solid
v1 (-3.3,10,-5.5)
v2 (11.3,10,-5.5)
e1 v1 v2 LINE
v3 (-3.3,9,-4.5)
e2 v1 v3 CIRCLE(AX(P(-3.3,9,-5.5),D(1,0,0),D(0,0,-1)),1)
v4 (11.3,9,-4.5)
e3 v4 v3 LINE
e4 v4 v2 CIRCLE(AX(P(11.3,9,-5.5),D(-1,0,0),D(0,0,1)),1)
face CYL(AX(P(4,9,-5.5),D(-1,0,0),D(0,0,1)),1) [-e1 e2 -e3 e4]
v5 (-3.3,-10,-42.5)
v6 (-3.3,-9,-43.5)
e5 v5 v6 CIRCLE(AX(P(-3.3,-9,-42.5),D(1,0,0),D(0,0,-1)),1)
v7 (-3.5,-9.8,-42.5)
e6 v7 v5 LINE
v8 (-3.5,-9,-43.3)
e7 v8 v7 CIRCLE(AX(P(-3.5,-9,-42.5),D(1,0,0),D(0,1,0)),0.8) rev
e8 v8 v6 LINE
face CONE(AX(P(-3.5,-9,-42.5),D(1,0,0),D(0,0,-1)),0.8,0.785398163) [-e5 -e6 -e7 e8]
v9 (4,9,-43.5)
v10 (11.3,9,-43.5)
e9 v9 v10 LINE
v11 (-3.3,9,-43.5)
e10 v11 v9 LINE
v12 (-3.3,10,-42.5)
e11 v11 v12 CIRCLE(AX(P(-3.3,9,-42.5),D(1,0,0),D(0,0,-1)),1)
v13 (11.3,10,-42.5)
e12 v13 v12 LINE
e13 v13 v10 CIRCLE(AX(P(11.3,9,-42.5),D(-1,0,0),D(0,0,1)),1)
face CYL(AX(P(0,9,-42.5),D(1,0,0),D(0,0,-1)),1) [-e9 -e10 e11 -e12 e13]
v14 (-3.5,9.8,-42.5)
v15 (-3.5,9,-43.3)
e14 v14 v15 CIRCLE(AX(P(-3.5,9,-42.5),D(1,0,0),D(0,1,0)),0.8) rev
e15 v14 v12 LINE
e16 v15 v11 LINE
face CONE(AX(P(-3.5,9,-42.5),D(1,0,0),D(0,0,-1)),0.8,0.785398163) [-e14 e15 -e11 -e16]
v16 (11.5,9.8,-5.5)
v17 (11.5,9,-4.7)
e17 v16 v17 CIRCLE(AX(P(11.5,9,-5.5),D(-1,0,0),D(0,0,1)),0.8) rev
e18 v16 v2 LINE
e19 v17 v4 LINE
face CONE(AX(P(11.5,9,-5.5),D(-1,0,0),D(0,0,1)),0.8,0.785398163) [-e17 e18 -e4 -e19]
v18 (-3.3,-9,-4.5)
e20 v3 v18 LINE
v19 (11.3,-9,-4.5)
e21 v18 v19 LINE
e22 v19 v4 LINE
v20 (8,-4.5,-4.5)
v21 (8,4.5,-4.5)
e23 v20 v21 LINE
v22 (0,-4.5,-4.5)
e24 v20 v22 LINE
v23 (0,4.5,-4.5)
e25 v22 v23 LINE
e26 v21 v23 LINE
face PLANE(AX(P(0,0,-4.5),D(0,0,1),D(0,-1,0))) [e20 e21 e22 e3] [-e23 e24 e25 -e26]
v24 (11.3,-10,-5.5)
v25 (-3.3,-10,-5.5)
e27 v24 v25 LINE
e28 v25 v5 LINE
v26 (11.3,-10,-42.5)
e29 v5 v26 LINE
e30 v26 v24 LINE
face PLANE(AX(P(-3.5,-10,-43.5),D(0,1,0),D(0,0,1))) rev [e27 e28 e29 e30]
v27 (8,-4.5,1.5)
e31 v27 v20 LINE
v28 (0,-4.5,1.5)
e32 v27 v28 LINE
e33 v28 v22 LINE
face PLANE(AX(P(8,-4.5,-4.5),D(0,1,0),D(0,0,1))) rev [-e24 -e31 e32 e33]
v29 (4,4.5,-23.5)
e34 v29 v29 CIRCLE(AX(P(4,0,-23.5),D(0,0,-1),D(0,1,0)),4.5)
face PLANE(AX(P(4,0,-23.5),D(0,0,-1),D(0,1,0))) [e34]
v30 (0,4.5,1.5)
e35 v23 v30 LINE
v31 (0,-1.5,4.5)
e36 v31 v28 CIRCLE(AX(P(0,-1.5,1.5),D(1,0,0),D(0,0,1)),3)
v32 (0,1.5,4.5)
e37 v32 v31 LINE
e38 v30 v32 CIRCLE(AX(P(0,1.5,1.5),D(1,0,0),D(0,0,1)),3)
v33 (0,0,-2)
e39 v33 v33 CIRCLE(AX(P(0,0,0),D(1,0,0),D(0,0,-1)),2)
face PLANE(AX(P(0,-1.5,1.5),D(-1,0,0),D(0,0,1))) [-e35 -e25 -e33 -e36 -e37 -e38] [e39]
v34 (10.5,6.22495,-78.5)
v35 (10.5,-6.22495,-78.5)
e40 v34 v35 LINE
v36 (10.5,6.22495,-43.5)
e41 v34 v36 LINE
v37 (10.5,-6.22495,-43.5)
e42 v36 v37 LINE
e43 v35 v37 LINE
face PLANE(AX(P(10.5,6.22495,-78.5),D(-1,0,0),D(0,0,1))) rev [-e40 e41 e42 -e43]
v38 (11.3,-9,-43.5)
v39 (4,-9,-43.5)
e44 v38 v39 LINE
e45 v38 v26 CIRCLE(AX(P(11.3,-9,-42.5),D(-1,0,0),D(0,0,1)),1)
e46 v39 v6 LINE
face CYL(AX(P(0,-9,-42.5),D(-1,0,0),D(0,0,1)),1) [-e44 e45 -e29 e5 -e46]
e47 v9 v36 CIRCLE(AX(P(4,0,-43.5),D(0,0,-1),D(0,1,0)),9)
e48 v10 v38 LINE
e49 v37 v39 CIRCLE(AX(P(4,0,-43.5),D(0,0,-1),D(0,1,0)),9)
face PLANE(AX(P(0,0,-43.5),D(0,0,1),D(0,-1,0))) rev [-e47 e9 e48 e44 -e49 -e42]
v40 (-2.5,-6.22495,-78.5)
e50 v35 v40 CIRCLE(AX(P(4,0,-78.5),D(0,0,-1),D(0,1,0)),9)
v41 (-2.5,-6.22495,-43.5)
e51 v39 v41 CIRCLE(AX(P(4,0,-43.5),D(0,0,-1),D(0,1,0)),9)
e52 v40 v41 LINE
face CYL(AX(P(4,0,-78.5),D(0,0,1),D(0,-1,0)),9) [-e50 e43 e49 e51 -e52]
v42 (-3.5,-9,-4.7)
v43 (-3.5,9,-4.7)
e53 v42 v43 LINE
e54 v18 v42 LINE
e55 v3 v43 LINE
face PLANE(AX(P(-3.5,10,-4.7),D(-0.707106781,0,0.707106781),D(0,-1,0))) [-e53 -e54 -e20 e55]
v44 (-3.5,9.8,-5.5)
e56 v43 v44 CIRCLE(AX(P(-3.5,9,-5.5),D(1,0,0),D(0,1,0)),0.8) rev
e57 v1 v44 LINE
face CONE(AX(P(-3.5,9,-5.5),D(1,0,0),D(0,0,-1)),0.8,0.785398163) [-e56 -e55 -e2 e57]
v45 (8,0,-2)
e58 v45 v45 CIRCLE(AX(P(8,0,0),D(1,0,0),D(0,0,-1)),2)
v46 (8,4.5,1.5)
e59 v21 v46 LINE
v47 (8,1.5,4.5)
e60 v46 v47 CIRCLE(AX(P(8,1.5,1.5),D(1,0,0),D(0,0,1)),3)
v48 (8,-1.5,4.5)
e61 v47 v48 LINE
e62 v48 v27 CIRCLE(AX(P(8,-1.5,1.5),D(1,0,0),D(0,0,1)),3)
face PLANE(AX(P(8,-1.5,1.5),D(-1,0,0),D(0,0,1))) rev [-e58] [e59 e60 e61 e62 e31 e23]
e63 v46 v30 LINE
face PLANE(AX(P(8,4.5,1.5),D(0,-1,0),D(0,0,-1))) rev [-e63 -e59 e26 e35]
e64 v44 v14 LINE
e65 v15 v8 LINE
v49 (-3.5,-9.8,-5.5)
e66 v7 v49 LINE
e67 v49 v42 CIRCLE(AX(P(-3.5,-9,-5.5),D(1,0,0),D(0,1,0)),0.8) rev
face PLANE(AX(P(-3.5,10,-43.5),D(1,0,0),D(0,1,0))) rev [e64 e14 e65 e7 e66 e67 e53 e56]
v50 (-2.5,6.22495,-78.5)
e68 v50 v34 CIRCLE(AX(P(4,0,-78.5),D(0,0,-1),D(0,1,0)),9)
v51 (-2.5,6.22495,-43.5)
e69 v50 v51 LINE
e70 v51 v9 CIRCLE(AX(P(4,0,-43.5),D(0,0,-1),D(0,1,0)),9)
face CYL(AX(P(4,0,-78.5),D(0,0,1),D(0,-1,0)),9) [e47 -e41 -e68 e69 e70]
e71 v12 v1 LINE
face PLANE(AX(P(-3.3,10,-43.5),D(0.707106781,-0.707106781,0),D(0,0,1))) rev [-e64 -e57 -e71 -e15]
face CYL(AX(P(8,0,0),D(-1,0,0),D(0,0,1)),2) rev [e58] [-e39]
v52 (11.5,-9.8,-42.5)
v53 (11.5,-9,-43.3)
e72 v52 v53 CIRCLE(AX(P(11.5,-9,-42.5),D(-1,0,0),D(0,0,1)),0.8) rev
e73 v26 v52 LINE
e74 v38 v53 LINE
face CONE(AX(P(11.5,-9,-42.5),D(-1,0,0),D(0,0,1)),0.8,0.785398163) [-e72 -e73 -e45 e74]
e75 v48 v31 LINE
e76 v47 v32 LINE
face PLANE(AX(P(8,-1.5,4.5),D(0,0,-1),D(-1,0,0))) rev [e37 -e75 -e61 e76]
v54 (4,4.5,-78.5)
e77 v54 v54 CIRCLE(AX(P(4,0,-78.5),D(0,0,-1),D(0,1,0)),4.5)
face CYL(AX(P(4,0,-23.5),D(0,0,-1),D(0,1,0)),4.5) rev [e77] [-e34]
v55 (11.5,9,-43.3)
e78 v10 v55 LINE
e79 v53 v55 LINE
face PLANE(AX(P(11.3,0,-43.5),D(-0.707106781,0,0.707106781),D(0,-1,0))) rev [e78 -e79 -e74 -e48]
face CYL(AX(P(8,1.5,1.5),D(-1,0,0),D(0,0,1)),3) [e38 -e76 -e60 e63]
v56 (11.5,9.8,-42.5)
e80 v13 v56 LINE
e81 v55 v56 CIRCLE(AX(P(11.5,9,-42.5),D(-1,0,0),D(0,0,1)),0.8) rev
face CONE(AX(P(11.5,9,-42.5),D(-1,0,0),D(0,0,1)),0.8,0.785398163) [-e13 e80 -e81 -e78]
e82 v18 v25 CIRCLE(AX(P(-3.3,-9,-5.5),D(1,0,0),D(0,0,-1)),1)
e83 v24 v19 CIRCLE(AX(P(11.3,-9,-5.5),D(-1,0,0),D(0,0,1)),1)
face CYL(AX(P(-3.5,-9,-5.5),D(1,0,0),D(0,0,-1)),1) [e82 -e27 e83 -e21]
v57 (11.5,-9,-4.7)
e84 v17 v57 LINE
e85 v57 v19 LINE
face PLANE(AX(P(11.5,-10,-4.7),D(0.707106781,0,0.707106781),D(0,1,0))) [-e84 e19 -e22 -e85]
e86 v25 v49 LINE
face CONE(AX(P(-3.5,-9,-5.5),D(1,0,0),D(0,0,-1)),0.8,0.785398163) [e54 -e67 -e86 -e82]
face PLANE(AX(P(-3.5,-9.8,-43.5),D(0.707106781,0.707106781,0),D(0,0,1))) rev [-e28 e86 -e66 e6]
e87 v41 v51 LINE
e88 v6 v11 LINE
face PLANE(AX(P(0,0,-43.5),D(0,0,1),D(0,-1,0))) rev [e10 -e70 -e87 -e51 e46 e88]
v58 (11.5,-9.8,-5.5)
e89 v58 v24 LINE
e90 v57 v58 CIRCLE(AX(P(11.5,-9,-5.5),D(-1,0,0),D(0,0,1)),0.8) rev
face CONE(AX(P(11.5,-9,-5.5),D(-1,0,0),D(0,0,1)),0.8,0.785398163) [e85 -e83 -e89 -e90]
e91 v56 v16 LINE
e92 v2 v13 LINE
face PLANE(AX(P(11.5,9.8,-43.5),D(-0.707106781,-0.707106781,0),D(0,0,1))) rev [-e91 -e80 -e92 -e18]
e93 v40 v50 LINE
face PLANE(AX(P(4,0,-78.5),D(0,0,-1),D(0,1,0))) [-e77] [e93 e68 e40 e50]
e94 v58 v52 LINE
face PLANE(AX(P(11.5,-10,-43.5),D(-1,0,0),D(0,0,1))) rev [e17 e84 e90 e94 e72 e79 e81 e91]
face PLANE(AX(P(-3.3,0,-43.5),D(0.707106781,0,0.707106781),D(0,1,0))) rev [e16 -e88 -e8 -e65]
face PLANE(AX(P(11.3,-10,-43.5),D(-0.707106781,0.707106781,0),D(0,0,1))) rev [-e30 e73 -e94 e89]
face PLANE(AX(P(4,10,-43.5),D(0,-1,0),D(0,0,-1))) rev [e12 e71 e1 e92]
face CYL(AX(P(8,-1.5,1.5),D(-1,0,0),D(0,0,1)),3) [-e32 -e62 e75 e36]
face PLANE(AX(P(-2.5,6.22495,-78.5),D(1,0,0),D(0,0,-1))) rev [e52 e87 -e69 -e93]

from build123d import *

# Parameters (mm, degrees)
SKETCH_1_R          = 2
EXTRUDE_1_DEPTH     = 8
EXTRUDE_2_DEPTH     = 39
EXTRUDE_3_DEPTH     = 35
SKETCH_4_R          = 4.5
CUT_EXTRUDE_1_DEPTH = 55
FILLET_1_R          = 1
CHAMFER_1_SIZE      = 0.2


with BuildPart() as part:
    # 草图1 → 凸台-拉伸1 (new body)
    with BuildSketch(Plane(origin=(0, 0, 0), x_dir=(0, 0, -1), z_dir=(1, 0, 0))):
        with BuildLine():
            Line((0, 4.5), (4.5, 4.5))
            Line((4.5, 4.5), (4.5, -4.5))
            Line((4.5, -4.5), (-1.5, -4.5))
            ThreePointArc((-1.5, -4.5), (-3.621320344, -3.621320344), (-4.5, -1.5))
            Line((-4.5, -1.5), (-4.5, 1.5))
            ThreePointArc((-4.5, 1.5), (-3.621320344, 3.621320344), (-1.5, 4.5))
            Line((-1.5, 4.5), (0, 4.5))
        make_face()
        Circle(SKETCH_1_R, mode=Mode.SUBTRACT)
    extrude(amount=EXTRUDE_1_DEPTH)

    # 草图2 → 凸台-拉伸2 (add)
    with BuildSketch(Plane(origin=(0, 0, -4.5), x_dir=(-1, 0, 0), z_dir=(0, 0, -1))):
        Polygon((-4, 10), (3.5, 10), (3.5, -10), (-11.5, -10), (-11.5, 10), align=None)
    extrude(amount=EXTRUDE_2_DEPTH)

    # 草图3 → 凸台-拉伸3 (add)
    with BuildSketch(Plane(origin=(0, 0, -43.5), x_dir=(-1, 0, 0), z_dir=(0, 0, -1))):
        with BuildLine():
            Line((2.5, 6.224949799), (2.5, -6.224949799))
            ThreePointArc((2.5, -6.224949799), (-4, -9), (-10.5, -6.224949799))
            Line((-10.5, -6.224949799), (-10.5, 6.224949799))
            ThreePointArc((-10.5, 6.224949799), (-4, 9), (2.5, 6.224949799))
        make_face()
    extrude(amount=EXTRUDE_3_DEPTH)

    # 草图4 → 切除-拉伸1 (cut)
    with BuildSketch(Plane(origin=(0, 0, -78.5), x_dir=(-1, 0, 0), z_dir=(0, 0, -1))):
        with Locations(Location((-4, 0, 0), (0, 0, 90))):
            Circle(SKETCH_4_R)
    extrude(amount=-CUT_EXTRUDE_1_DEPTH, mode=Mode.SUBTRACT)

    # 圆角1
    fillet_1_edges = [part.edges().sort_by_distance(p)[0] for p in [
        (4, -10, -4.5),
        (4, 10, -4.5),
        (4, 10, -43.5),
        (4, -10, -43.5),
    ]]
    fillet(fillet_1_edges, radius=FILLET_1_R - 0.0001)  # a hair under: the kernel refuses the full size

    # 倒角1
    chamfer_1_edges = [part.edges().sort_by_distance(p)[0] for p in [
        (-3.5, -10, -24),
        (11.5, -10, -24),
        (-3.5, 0, -4.5),
        (-3.5, 10, -24),
        (-3.5, 0, -43.5),
        (-3.5, 9.707136071, -4.792863929),
        (-3.5, 9.707136071, -43.207136071),
        (-3.5, -9.707136071, -43.207136071),
        (-3.5, -9.707136071, -4.792863929),
        (11.5, 0, -4.5),
        (11.5, 0, -43.5),
        (11.5, 10, -24),
        (11.5, 9.707136071, -4.792863929),
        (11.5, 9.707136071, -43.207136071),
        (11.5, -9.707136071, -43.207136071),
        (11.5, -9.707136071, -4.792863929),
    ]]
    chamfer(chamfer_1_edges, length=CHAMFER_1_SIZE)


solid = part.part
